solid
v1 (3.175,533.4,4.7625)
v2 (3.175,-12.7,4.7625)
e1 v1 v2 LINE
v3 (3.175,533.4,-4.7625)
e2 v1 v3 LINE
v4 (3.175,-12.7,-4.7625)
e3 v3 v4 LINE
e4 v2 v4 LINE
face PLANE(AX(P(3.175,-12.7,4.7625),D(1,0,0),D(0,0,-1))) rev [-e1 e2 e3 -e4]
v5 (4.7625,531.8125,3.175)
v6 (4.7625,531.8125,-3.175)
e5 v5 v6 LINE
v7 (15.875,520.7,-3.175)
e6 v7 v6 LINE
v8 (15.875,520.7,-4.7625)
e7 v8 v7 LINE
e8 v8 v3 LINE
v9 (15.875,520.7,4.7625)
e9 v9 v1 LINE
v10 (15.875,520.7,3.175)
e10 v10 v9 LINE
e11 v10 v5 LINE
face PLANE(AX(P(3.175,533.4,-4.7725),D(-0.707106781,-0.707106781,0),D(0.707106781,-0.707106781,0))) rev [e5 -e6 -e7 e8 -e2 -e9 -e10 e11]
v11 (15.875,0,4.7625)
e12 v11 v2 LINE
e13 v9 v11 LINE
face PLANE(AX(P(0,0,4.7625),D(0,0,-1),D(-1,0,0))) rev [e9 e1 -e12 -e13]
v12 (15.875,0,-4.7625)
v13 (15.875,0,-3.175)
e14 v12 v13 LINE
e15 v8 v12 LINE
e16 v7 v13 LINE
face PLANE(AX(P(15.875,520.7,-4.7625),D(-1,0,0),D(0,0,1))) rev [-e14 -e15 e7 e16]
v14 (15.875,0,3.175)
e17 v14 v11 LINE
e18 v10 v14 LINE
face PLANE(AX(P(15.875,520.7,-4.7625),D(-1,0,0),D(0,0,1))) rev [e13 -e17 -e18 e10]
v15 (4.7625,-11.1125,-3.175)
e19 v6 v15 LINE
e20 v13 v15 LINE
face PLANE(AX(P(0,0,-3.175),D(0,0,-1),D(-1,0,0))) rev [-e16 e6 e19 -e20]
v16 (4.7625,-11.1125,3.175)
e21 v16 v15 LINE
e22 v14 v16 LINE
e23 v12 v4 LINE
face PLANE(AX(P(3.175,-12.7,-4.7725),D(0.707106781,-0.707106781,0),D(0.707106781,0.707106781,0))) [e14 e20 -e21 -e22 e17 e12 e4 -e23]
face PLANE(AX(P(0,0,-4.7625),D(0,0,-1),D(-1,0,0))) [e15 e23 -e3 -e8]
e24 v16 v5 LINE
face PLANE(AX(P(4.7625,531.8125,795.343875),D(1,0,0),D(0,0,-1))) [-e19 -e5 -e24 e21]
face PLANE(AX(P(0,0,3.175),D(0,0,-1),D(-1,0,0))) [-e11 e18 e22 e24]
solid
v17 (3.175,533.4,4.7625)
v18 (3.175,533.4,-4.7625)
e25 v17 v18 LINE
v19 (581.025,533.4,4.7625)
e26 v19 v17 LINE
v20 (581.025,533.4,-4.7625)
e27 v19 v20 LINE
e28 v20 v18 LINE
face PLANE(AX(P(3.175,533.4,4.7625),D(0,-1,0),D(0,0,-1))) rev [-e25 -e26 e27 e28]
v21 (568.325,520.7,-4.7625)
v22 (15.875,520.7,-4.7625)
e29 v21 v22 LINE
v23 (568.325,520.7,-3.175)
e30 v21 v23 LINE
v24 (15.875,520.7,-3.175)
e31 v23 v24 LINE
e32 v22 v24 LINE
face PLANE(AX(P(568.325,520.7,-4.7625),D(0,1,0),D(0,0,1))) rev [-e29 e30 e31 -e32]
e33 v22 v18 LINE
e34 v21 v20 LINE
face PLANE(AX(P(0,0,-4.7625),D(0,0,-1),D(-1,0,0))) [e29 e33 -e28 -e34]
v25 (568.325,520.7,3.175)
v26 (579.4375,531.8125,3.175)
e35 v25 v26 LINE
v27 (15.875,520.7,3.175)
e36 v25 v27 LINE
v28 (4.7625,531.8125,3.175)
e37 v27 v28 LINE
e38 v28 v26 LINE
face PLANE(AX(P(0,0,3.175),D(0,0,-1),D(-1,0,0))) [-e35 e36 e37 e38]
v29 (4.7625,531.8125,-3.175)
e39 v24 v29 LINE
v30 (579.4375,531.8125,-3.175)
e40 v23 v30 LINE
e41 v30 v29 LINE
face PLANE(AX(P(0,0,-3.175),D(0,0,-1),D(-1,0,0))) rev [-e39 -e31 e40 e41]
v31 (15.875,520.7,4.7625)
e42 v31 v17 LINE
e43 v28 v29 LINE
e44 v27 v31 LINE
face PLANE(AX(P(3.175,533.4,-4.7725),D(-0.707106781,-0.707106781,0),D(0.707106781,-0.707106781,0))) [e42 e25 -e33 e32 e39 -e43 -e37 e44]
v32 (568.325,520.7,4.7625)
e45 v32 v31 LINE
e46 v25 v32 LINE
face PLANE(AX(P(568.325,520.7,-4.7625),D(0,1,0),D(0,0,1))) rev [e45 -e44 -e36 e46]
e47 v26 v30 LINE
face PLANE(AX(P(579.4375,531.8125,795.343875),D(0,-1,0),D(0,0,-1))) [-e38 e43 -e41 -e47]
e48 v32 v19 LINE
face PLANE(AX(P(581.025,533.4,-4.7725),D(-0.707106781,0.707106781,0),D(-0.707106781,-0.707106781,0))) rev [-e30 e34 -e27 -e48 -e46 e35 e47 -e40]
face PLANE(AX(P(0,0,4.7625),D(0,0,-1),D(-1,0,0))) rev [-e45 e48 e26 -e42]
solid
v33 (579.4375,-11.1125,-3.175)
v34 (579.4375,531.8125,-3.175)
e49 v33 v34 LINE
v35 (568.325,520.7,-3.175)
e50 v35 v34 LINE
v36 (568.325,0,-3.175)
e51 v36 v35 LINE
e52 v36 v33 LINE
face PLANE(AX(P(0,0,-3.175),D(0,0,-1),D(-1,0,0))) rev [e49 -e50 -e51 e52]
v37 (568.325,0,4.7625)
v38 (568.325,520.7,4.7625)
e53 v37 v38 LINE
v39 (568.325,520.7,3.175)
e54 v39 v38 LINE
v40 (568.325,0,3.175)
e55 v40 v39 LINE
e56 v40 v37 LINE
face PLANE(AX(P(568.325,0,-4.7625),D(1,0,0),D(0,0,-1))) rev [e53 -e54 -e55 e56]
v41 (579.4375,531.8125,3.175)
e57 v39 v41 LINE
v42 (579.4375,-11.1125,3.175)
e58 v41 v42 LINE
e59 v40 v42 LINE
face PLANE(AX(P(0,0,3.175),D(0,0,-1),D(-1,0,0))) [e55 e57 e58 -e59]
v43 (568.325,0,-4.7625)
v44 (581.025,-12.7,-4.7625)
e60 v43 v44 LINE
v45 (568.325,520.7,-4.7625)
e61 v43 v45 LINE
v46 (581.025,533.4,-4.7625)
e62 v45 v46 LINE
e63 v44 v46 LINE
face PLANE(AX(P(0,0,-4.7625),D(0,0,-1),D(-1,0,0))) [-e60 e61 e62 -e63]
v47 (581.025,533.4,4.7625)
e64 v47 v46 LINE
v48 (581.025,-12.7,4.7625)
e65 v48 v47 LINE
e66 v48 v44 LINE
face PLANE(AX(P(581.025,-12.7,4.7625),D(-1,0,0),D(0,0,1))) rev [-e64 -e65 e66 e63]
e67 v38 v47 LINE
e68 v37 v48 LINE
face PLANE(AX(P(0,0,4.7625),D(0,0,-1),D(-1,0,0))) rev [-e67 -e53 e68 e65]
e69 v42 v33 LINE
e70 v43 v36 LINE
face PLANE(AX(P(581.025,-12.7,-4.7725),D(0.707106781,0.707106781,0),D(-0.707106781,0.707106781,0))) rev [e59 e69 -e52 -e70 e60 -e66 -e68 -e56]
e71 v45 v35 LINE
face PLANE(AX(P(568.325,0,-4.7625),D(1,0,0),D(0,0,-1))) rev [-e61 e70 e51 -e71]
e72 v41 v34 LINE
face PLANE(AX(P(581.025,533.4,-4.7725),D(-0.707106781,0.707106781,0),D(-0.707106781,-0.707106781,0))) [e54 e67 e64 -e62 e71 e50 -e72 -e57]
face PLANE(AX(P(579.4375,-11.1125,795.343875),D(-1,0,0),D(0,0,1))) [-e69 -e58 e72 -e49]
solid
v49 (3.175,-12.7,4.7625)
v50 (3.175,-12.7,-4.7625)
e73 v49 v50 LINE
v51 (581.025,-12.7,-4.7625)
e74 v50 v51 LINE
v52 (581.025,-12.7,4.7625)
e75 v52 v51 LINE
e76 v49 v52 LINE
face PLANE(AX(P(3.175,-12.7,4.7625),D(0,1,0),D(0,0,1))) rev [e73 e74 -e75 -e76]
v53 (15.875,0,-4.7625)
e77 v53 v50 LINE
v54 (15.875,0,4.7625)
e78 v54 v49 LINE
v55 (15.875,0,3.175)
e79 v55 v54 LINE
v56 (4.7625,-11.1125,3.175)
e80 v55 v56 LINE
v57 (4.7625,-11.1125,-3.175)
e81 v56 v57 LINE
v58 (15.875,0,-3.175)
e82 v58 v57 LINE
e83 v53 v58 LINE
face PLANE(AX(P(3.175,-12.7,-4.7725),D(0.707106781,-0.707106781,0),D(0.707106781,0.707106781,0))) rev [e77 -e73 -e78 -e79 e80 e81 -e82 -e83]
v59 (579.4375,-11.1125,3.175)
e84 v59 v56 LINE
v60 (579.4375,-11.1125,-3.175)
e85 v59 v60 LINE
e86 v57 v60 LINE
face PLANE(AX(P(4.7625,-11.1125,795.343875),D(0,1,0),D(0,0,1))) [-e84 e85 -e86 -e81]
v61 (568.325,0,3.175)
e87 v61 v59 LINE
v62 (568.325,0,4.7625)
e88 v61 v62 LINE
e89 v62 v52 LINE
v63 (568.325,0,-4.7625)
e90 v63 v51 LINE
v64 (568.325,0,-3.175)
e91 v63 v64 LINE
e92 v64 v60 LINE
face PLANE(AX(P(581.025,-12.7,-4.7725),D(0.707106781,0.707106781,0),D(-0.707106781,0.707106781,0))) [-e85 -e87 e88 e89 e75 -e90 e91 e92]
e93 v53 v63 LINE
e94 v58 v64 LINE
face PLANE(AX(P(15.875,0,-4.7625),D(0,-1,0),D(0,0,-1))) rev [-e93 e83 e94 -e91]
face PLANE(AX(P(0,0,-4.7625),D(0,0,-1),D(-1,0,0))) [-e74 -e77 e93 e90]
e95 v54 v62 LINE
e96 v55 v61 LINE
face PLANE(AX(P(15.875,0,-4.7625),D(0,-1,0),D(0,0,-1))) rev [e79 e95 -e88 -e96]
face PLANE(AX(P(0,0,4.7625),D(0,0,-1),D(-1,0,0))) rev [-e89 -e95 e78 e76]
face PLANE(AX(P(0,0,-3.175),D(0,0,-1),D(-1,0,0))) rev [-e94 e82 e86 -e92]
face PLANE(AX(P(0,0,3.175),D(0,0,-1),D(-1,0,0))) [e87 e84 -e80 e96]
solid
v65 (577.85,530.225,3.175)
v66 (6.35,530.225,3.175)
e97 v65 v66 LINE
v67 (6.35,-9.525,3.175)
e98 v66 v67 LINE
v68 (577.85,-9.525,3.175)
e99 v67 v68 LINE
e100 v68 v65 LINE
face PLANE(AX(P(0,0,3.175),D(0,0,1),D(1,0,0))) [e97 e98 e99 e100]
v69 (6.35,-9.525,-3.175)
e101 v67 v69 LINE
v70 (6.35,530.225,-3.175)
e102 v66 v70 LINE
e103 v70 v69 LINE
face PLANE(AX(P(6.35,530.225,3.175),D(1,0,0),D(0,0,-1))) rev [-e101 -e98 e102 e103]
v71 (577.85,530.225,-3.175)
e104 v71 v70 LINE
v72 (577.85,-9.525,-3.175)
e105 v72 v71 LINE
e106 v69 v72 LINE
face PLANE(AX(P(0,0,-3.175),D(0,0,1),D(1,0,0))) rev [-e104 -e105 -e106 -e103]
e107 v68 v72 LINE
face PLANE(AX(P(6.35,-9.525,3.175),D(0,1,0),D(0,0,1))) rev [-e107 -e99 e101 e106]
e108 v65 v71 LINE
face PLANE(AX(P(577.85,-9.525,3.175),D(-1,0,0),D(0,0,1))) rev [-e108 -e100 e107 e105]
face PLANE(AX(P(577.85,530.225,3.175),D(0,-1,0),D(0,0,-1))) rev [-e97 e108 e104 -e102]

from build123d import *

# Parameters (mm, degrees)
SKETCH2_W               = 577.85
SKETCH2_H               = 546.1
BOSS_EXTRUDE1_DEPTH     = 4.7625
SKETCH3_W               = 552.45
SKETCH3_H               = 520.7
CUT_EXTRUDE1_DEPTH      = 789.794229346
CUT_EXTRUDE2_DEPTH      = 3.175
CUT_EXTRUDE2_DEPTH_BACK = 3.175
SKETCH4_W               = 574.675
SKETCH4_H               = 542.925
SPLIT1_START            = -4.7625
SPLIT1_DEPTH            = 1.5875
SPLIT1_START_2          = 3.175
SPLIT1_2_DEPTH          = 1.5875
SPLIT1_START_3          = -3.175
SPLIT1_3_DEPTH          = 6.35
SPLIT1_START_4          = -374.925693055
SPLIT1_4_OUTLINE_W      = 387.415821115
SPLIT1_4_OUTLINE_H      = 9.525
SPLIT1_4_DEPTH          = 776.792154473
SPLIT1_START_5          = 33.675960454
SPLIT1_5_OUTLINE_W      = 410.584178885
SPLIT1_5_OUTLINE_H      = 9.525
SPLIT1_5_DEPTH          = 386.151013206
SPLIT1_6_DEPTH          = 1.5875
SPLIT1_7_DEPTH          = 1.5875
SPLIT1_8_DEPTH          = 6.35
SPLIT1_9_DEPTH          = 1.5875
SPLIT1_10_DEPTH         = 1.5875
SPLIT1_11_DEPTH         = 6.35
SKETCH6_W               = 571.5
SKETCH6_H               = 539.75
BOSS_EXTRUDE2_DEPTH     = 3.175


# Read off the part's stored shape, not the designer's step: Split1
with BuildPart() as part:
    # Sketch2 → Boss-Extrude1 (new, symmetric)
    with BuildSketch(Plane.XY):
        with Locations((292.1, 260.35)):
            Rectangle(SKETCH2_W, SKETCH2_H)
    extrude(amount=BOSS_EXTRUDE1_DEPTH, both=True)

    # Sketch3 → Cut-Extrude1 (cut, through all)
    with BuildSketch(Plane.XY.offset(4.7625)):
        with Locations((292.1, 260.35)):
            Rectangle(SKETCH3_W, SKETCH3_H)
    extrude(amount=-CUT_EXTRUDE1_DEPTH, mode=Mode.SUBTRACT)

    # Sketch4 → Cut-Extrude2 (cut, two sides: drawn at the far end of the back side and taken through both)
    with BuildSketch(Plane.XY.offset(-CUT_EXTRUDE2_DEPTH_BACK)):
        with Locations((292.1, 260.35)):
            Rectangle(SKETCH4_W, SKETCH4_H)
    extrude(amount=CUT_EXTRUDE2_DEPTH + CUT_EXTRUDE2_DEPTH_BACK, mode=Mode.SUBTRACT)

    # Split1 4 outline → Split1 4 (cut)
    with BuildSketch(Plane(origin=(0, 0, 0), x_dir=(0.7071067811865474, 0.7071067811865477, 0), z_dir=(0.7071067811865476, -0.7071067811865476, 0)).offset(SPLIT1_START_4)):
        with Locations((185.707910558, 0)):
            Rectangle(SPLIT1_4_OUTLINE_W, SPLIT1_4_OUTLINE_H)
    extrude(amount=SPLIT1_4_DEPTH, mode=Mode.SUBTRACT)

    # Split1 5 outline → Split1 5 (cut)
    with BuildSketch(Plane(origin=(0, 0, 0), x_dir=(0.7071067811865474, 0.7071067811865477, 0), z_dir=(0.7071067811865476, -0.7071067811865476, 0)).offset(SPLIT1_START_5)):
        with Locations((584.707910557, 0)):
            Rectangle(SPLIT1_5_OUTLINE_W, SPLIT1_5_OUTLINE_H)
    extrude(amount=SPLIT1_5_DEPTH, mode=Mode.SUBTRACT)


with BuildPart() as body_2:
    # Split1 outline → Split1 (new body)
    with BuildSketch(Plane.XY.offset(SPLIT1_START)):
        Polygon((3.175, 533.4), (3.175, -12.7), (15.875, 0), (15.875, 520.7), align=None)
    extrude(amount=SPLIT1_DEPTH)

    # Split1 2 outline → Split1 2 (add)
    with BuildSketch(Plane.XY.offset(SPLIT1_START_2)):
        Polygon((3.175, 533.4), (3.175, -12.7), (15.875, 0), (15.875, 520.7), align=None)
    extrude(amount=SPLIT1_2_DEPTH)

    # Split1 3 outline → Split1 3 (add)
    with BuildSketch(Plane.XY.offset(SPLIT1_START_3)):
        Polygon((4.7625, 531.8125), (3.175, 533.4), (3.175, -12.7), (4.7625, -11.1125), align=None)
    extrude(amount=SPLIT1_3_DEPTH)


with BuildPart() as body_3:
    # Split1 6 outline → Split1 6 (new body)
    with BuildSketch(Plane.XY.offset(SPLIT1_START)):
        Polygon((581.025, -12.7), (581.025, 533.4), (568.325, 520.7), (568.325, 0), align=None)
    extrude(amount=SPLIT1_6_DEPTH)

    # Split1 7 outline → Split1 7 (add)
    with BuildSketch(Plane.XY.offset(SPLIT1_START_2)):
        Polygon((581.025, -12.7), (581.025, 533.4), (568.325, 520.7), (568.325, 0), align=None)
    extrude(amount=SPLIT1_7_DEPTH)

    # Split1 8 outline → Split1 8 (add)
    with BuildSketch(Plane.XY.offset(SPLIT1_START_3)):
        Polygon((579.4375, -11.1125), (581.025, -12.7), (581.025, 533.4), (579.4375, 531.8125), align=None)
    extrude(amount=SPLIT1_8_DEPTH)


with BuildPart() as body_4:
    # Split1 9 outline → Split1 9 (new body)
    with BuildSketch(Plane.XY.offset(SPLIT1_START)):
        Polygon((3.175, -12.7), (581.025, -12.7), (568.325, 0), (15.875, 0), align=None)
    extrude(amount=SPLIT1_9_DEPTH)

    # Split1 10 outline → Split1 10 (add)
    with BuildSketch(Plane.XY.offset(SPLIT1_START_2)):
        Polygon((3.175, -12.7), (581.025, -12.7), (568.325, 0), (15.875, 0), align=None)
    extrude(amount=SPLIT1_10_DEPTH)

    # Split1 11 outline → Split1 11 (add)
    with BuildSketch(Plane.XY.offset(SPLIT1_START_3)):
        Polygon((4.7625, -11.1125), (3.175, -12.7), (581.025, -12.7), (579.4375, -11.1125), align=None)
    extrude(amount=SPLIT1_11_DEPTH)


with BuildPart() as body_5:
    # Sketch6 → Boss-Extrude2 (new, symmetric)
    with BuildSketch(Plane.XY):
        with Locations((292.1, 260.35)):
            Rectangle(SKETCH6_W, SKETCH6_H)
    extrude(amount=BOSS_EXTRUDE2_DEPTH, both=True)


solid = Compound([part.part, body_2.part, body_3.part, body_4.part, body_5.part])
